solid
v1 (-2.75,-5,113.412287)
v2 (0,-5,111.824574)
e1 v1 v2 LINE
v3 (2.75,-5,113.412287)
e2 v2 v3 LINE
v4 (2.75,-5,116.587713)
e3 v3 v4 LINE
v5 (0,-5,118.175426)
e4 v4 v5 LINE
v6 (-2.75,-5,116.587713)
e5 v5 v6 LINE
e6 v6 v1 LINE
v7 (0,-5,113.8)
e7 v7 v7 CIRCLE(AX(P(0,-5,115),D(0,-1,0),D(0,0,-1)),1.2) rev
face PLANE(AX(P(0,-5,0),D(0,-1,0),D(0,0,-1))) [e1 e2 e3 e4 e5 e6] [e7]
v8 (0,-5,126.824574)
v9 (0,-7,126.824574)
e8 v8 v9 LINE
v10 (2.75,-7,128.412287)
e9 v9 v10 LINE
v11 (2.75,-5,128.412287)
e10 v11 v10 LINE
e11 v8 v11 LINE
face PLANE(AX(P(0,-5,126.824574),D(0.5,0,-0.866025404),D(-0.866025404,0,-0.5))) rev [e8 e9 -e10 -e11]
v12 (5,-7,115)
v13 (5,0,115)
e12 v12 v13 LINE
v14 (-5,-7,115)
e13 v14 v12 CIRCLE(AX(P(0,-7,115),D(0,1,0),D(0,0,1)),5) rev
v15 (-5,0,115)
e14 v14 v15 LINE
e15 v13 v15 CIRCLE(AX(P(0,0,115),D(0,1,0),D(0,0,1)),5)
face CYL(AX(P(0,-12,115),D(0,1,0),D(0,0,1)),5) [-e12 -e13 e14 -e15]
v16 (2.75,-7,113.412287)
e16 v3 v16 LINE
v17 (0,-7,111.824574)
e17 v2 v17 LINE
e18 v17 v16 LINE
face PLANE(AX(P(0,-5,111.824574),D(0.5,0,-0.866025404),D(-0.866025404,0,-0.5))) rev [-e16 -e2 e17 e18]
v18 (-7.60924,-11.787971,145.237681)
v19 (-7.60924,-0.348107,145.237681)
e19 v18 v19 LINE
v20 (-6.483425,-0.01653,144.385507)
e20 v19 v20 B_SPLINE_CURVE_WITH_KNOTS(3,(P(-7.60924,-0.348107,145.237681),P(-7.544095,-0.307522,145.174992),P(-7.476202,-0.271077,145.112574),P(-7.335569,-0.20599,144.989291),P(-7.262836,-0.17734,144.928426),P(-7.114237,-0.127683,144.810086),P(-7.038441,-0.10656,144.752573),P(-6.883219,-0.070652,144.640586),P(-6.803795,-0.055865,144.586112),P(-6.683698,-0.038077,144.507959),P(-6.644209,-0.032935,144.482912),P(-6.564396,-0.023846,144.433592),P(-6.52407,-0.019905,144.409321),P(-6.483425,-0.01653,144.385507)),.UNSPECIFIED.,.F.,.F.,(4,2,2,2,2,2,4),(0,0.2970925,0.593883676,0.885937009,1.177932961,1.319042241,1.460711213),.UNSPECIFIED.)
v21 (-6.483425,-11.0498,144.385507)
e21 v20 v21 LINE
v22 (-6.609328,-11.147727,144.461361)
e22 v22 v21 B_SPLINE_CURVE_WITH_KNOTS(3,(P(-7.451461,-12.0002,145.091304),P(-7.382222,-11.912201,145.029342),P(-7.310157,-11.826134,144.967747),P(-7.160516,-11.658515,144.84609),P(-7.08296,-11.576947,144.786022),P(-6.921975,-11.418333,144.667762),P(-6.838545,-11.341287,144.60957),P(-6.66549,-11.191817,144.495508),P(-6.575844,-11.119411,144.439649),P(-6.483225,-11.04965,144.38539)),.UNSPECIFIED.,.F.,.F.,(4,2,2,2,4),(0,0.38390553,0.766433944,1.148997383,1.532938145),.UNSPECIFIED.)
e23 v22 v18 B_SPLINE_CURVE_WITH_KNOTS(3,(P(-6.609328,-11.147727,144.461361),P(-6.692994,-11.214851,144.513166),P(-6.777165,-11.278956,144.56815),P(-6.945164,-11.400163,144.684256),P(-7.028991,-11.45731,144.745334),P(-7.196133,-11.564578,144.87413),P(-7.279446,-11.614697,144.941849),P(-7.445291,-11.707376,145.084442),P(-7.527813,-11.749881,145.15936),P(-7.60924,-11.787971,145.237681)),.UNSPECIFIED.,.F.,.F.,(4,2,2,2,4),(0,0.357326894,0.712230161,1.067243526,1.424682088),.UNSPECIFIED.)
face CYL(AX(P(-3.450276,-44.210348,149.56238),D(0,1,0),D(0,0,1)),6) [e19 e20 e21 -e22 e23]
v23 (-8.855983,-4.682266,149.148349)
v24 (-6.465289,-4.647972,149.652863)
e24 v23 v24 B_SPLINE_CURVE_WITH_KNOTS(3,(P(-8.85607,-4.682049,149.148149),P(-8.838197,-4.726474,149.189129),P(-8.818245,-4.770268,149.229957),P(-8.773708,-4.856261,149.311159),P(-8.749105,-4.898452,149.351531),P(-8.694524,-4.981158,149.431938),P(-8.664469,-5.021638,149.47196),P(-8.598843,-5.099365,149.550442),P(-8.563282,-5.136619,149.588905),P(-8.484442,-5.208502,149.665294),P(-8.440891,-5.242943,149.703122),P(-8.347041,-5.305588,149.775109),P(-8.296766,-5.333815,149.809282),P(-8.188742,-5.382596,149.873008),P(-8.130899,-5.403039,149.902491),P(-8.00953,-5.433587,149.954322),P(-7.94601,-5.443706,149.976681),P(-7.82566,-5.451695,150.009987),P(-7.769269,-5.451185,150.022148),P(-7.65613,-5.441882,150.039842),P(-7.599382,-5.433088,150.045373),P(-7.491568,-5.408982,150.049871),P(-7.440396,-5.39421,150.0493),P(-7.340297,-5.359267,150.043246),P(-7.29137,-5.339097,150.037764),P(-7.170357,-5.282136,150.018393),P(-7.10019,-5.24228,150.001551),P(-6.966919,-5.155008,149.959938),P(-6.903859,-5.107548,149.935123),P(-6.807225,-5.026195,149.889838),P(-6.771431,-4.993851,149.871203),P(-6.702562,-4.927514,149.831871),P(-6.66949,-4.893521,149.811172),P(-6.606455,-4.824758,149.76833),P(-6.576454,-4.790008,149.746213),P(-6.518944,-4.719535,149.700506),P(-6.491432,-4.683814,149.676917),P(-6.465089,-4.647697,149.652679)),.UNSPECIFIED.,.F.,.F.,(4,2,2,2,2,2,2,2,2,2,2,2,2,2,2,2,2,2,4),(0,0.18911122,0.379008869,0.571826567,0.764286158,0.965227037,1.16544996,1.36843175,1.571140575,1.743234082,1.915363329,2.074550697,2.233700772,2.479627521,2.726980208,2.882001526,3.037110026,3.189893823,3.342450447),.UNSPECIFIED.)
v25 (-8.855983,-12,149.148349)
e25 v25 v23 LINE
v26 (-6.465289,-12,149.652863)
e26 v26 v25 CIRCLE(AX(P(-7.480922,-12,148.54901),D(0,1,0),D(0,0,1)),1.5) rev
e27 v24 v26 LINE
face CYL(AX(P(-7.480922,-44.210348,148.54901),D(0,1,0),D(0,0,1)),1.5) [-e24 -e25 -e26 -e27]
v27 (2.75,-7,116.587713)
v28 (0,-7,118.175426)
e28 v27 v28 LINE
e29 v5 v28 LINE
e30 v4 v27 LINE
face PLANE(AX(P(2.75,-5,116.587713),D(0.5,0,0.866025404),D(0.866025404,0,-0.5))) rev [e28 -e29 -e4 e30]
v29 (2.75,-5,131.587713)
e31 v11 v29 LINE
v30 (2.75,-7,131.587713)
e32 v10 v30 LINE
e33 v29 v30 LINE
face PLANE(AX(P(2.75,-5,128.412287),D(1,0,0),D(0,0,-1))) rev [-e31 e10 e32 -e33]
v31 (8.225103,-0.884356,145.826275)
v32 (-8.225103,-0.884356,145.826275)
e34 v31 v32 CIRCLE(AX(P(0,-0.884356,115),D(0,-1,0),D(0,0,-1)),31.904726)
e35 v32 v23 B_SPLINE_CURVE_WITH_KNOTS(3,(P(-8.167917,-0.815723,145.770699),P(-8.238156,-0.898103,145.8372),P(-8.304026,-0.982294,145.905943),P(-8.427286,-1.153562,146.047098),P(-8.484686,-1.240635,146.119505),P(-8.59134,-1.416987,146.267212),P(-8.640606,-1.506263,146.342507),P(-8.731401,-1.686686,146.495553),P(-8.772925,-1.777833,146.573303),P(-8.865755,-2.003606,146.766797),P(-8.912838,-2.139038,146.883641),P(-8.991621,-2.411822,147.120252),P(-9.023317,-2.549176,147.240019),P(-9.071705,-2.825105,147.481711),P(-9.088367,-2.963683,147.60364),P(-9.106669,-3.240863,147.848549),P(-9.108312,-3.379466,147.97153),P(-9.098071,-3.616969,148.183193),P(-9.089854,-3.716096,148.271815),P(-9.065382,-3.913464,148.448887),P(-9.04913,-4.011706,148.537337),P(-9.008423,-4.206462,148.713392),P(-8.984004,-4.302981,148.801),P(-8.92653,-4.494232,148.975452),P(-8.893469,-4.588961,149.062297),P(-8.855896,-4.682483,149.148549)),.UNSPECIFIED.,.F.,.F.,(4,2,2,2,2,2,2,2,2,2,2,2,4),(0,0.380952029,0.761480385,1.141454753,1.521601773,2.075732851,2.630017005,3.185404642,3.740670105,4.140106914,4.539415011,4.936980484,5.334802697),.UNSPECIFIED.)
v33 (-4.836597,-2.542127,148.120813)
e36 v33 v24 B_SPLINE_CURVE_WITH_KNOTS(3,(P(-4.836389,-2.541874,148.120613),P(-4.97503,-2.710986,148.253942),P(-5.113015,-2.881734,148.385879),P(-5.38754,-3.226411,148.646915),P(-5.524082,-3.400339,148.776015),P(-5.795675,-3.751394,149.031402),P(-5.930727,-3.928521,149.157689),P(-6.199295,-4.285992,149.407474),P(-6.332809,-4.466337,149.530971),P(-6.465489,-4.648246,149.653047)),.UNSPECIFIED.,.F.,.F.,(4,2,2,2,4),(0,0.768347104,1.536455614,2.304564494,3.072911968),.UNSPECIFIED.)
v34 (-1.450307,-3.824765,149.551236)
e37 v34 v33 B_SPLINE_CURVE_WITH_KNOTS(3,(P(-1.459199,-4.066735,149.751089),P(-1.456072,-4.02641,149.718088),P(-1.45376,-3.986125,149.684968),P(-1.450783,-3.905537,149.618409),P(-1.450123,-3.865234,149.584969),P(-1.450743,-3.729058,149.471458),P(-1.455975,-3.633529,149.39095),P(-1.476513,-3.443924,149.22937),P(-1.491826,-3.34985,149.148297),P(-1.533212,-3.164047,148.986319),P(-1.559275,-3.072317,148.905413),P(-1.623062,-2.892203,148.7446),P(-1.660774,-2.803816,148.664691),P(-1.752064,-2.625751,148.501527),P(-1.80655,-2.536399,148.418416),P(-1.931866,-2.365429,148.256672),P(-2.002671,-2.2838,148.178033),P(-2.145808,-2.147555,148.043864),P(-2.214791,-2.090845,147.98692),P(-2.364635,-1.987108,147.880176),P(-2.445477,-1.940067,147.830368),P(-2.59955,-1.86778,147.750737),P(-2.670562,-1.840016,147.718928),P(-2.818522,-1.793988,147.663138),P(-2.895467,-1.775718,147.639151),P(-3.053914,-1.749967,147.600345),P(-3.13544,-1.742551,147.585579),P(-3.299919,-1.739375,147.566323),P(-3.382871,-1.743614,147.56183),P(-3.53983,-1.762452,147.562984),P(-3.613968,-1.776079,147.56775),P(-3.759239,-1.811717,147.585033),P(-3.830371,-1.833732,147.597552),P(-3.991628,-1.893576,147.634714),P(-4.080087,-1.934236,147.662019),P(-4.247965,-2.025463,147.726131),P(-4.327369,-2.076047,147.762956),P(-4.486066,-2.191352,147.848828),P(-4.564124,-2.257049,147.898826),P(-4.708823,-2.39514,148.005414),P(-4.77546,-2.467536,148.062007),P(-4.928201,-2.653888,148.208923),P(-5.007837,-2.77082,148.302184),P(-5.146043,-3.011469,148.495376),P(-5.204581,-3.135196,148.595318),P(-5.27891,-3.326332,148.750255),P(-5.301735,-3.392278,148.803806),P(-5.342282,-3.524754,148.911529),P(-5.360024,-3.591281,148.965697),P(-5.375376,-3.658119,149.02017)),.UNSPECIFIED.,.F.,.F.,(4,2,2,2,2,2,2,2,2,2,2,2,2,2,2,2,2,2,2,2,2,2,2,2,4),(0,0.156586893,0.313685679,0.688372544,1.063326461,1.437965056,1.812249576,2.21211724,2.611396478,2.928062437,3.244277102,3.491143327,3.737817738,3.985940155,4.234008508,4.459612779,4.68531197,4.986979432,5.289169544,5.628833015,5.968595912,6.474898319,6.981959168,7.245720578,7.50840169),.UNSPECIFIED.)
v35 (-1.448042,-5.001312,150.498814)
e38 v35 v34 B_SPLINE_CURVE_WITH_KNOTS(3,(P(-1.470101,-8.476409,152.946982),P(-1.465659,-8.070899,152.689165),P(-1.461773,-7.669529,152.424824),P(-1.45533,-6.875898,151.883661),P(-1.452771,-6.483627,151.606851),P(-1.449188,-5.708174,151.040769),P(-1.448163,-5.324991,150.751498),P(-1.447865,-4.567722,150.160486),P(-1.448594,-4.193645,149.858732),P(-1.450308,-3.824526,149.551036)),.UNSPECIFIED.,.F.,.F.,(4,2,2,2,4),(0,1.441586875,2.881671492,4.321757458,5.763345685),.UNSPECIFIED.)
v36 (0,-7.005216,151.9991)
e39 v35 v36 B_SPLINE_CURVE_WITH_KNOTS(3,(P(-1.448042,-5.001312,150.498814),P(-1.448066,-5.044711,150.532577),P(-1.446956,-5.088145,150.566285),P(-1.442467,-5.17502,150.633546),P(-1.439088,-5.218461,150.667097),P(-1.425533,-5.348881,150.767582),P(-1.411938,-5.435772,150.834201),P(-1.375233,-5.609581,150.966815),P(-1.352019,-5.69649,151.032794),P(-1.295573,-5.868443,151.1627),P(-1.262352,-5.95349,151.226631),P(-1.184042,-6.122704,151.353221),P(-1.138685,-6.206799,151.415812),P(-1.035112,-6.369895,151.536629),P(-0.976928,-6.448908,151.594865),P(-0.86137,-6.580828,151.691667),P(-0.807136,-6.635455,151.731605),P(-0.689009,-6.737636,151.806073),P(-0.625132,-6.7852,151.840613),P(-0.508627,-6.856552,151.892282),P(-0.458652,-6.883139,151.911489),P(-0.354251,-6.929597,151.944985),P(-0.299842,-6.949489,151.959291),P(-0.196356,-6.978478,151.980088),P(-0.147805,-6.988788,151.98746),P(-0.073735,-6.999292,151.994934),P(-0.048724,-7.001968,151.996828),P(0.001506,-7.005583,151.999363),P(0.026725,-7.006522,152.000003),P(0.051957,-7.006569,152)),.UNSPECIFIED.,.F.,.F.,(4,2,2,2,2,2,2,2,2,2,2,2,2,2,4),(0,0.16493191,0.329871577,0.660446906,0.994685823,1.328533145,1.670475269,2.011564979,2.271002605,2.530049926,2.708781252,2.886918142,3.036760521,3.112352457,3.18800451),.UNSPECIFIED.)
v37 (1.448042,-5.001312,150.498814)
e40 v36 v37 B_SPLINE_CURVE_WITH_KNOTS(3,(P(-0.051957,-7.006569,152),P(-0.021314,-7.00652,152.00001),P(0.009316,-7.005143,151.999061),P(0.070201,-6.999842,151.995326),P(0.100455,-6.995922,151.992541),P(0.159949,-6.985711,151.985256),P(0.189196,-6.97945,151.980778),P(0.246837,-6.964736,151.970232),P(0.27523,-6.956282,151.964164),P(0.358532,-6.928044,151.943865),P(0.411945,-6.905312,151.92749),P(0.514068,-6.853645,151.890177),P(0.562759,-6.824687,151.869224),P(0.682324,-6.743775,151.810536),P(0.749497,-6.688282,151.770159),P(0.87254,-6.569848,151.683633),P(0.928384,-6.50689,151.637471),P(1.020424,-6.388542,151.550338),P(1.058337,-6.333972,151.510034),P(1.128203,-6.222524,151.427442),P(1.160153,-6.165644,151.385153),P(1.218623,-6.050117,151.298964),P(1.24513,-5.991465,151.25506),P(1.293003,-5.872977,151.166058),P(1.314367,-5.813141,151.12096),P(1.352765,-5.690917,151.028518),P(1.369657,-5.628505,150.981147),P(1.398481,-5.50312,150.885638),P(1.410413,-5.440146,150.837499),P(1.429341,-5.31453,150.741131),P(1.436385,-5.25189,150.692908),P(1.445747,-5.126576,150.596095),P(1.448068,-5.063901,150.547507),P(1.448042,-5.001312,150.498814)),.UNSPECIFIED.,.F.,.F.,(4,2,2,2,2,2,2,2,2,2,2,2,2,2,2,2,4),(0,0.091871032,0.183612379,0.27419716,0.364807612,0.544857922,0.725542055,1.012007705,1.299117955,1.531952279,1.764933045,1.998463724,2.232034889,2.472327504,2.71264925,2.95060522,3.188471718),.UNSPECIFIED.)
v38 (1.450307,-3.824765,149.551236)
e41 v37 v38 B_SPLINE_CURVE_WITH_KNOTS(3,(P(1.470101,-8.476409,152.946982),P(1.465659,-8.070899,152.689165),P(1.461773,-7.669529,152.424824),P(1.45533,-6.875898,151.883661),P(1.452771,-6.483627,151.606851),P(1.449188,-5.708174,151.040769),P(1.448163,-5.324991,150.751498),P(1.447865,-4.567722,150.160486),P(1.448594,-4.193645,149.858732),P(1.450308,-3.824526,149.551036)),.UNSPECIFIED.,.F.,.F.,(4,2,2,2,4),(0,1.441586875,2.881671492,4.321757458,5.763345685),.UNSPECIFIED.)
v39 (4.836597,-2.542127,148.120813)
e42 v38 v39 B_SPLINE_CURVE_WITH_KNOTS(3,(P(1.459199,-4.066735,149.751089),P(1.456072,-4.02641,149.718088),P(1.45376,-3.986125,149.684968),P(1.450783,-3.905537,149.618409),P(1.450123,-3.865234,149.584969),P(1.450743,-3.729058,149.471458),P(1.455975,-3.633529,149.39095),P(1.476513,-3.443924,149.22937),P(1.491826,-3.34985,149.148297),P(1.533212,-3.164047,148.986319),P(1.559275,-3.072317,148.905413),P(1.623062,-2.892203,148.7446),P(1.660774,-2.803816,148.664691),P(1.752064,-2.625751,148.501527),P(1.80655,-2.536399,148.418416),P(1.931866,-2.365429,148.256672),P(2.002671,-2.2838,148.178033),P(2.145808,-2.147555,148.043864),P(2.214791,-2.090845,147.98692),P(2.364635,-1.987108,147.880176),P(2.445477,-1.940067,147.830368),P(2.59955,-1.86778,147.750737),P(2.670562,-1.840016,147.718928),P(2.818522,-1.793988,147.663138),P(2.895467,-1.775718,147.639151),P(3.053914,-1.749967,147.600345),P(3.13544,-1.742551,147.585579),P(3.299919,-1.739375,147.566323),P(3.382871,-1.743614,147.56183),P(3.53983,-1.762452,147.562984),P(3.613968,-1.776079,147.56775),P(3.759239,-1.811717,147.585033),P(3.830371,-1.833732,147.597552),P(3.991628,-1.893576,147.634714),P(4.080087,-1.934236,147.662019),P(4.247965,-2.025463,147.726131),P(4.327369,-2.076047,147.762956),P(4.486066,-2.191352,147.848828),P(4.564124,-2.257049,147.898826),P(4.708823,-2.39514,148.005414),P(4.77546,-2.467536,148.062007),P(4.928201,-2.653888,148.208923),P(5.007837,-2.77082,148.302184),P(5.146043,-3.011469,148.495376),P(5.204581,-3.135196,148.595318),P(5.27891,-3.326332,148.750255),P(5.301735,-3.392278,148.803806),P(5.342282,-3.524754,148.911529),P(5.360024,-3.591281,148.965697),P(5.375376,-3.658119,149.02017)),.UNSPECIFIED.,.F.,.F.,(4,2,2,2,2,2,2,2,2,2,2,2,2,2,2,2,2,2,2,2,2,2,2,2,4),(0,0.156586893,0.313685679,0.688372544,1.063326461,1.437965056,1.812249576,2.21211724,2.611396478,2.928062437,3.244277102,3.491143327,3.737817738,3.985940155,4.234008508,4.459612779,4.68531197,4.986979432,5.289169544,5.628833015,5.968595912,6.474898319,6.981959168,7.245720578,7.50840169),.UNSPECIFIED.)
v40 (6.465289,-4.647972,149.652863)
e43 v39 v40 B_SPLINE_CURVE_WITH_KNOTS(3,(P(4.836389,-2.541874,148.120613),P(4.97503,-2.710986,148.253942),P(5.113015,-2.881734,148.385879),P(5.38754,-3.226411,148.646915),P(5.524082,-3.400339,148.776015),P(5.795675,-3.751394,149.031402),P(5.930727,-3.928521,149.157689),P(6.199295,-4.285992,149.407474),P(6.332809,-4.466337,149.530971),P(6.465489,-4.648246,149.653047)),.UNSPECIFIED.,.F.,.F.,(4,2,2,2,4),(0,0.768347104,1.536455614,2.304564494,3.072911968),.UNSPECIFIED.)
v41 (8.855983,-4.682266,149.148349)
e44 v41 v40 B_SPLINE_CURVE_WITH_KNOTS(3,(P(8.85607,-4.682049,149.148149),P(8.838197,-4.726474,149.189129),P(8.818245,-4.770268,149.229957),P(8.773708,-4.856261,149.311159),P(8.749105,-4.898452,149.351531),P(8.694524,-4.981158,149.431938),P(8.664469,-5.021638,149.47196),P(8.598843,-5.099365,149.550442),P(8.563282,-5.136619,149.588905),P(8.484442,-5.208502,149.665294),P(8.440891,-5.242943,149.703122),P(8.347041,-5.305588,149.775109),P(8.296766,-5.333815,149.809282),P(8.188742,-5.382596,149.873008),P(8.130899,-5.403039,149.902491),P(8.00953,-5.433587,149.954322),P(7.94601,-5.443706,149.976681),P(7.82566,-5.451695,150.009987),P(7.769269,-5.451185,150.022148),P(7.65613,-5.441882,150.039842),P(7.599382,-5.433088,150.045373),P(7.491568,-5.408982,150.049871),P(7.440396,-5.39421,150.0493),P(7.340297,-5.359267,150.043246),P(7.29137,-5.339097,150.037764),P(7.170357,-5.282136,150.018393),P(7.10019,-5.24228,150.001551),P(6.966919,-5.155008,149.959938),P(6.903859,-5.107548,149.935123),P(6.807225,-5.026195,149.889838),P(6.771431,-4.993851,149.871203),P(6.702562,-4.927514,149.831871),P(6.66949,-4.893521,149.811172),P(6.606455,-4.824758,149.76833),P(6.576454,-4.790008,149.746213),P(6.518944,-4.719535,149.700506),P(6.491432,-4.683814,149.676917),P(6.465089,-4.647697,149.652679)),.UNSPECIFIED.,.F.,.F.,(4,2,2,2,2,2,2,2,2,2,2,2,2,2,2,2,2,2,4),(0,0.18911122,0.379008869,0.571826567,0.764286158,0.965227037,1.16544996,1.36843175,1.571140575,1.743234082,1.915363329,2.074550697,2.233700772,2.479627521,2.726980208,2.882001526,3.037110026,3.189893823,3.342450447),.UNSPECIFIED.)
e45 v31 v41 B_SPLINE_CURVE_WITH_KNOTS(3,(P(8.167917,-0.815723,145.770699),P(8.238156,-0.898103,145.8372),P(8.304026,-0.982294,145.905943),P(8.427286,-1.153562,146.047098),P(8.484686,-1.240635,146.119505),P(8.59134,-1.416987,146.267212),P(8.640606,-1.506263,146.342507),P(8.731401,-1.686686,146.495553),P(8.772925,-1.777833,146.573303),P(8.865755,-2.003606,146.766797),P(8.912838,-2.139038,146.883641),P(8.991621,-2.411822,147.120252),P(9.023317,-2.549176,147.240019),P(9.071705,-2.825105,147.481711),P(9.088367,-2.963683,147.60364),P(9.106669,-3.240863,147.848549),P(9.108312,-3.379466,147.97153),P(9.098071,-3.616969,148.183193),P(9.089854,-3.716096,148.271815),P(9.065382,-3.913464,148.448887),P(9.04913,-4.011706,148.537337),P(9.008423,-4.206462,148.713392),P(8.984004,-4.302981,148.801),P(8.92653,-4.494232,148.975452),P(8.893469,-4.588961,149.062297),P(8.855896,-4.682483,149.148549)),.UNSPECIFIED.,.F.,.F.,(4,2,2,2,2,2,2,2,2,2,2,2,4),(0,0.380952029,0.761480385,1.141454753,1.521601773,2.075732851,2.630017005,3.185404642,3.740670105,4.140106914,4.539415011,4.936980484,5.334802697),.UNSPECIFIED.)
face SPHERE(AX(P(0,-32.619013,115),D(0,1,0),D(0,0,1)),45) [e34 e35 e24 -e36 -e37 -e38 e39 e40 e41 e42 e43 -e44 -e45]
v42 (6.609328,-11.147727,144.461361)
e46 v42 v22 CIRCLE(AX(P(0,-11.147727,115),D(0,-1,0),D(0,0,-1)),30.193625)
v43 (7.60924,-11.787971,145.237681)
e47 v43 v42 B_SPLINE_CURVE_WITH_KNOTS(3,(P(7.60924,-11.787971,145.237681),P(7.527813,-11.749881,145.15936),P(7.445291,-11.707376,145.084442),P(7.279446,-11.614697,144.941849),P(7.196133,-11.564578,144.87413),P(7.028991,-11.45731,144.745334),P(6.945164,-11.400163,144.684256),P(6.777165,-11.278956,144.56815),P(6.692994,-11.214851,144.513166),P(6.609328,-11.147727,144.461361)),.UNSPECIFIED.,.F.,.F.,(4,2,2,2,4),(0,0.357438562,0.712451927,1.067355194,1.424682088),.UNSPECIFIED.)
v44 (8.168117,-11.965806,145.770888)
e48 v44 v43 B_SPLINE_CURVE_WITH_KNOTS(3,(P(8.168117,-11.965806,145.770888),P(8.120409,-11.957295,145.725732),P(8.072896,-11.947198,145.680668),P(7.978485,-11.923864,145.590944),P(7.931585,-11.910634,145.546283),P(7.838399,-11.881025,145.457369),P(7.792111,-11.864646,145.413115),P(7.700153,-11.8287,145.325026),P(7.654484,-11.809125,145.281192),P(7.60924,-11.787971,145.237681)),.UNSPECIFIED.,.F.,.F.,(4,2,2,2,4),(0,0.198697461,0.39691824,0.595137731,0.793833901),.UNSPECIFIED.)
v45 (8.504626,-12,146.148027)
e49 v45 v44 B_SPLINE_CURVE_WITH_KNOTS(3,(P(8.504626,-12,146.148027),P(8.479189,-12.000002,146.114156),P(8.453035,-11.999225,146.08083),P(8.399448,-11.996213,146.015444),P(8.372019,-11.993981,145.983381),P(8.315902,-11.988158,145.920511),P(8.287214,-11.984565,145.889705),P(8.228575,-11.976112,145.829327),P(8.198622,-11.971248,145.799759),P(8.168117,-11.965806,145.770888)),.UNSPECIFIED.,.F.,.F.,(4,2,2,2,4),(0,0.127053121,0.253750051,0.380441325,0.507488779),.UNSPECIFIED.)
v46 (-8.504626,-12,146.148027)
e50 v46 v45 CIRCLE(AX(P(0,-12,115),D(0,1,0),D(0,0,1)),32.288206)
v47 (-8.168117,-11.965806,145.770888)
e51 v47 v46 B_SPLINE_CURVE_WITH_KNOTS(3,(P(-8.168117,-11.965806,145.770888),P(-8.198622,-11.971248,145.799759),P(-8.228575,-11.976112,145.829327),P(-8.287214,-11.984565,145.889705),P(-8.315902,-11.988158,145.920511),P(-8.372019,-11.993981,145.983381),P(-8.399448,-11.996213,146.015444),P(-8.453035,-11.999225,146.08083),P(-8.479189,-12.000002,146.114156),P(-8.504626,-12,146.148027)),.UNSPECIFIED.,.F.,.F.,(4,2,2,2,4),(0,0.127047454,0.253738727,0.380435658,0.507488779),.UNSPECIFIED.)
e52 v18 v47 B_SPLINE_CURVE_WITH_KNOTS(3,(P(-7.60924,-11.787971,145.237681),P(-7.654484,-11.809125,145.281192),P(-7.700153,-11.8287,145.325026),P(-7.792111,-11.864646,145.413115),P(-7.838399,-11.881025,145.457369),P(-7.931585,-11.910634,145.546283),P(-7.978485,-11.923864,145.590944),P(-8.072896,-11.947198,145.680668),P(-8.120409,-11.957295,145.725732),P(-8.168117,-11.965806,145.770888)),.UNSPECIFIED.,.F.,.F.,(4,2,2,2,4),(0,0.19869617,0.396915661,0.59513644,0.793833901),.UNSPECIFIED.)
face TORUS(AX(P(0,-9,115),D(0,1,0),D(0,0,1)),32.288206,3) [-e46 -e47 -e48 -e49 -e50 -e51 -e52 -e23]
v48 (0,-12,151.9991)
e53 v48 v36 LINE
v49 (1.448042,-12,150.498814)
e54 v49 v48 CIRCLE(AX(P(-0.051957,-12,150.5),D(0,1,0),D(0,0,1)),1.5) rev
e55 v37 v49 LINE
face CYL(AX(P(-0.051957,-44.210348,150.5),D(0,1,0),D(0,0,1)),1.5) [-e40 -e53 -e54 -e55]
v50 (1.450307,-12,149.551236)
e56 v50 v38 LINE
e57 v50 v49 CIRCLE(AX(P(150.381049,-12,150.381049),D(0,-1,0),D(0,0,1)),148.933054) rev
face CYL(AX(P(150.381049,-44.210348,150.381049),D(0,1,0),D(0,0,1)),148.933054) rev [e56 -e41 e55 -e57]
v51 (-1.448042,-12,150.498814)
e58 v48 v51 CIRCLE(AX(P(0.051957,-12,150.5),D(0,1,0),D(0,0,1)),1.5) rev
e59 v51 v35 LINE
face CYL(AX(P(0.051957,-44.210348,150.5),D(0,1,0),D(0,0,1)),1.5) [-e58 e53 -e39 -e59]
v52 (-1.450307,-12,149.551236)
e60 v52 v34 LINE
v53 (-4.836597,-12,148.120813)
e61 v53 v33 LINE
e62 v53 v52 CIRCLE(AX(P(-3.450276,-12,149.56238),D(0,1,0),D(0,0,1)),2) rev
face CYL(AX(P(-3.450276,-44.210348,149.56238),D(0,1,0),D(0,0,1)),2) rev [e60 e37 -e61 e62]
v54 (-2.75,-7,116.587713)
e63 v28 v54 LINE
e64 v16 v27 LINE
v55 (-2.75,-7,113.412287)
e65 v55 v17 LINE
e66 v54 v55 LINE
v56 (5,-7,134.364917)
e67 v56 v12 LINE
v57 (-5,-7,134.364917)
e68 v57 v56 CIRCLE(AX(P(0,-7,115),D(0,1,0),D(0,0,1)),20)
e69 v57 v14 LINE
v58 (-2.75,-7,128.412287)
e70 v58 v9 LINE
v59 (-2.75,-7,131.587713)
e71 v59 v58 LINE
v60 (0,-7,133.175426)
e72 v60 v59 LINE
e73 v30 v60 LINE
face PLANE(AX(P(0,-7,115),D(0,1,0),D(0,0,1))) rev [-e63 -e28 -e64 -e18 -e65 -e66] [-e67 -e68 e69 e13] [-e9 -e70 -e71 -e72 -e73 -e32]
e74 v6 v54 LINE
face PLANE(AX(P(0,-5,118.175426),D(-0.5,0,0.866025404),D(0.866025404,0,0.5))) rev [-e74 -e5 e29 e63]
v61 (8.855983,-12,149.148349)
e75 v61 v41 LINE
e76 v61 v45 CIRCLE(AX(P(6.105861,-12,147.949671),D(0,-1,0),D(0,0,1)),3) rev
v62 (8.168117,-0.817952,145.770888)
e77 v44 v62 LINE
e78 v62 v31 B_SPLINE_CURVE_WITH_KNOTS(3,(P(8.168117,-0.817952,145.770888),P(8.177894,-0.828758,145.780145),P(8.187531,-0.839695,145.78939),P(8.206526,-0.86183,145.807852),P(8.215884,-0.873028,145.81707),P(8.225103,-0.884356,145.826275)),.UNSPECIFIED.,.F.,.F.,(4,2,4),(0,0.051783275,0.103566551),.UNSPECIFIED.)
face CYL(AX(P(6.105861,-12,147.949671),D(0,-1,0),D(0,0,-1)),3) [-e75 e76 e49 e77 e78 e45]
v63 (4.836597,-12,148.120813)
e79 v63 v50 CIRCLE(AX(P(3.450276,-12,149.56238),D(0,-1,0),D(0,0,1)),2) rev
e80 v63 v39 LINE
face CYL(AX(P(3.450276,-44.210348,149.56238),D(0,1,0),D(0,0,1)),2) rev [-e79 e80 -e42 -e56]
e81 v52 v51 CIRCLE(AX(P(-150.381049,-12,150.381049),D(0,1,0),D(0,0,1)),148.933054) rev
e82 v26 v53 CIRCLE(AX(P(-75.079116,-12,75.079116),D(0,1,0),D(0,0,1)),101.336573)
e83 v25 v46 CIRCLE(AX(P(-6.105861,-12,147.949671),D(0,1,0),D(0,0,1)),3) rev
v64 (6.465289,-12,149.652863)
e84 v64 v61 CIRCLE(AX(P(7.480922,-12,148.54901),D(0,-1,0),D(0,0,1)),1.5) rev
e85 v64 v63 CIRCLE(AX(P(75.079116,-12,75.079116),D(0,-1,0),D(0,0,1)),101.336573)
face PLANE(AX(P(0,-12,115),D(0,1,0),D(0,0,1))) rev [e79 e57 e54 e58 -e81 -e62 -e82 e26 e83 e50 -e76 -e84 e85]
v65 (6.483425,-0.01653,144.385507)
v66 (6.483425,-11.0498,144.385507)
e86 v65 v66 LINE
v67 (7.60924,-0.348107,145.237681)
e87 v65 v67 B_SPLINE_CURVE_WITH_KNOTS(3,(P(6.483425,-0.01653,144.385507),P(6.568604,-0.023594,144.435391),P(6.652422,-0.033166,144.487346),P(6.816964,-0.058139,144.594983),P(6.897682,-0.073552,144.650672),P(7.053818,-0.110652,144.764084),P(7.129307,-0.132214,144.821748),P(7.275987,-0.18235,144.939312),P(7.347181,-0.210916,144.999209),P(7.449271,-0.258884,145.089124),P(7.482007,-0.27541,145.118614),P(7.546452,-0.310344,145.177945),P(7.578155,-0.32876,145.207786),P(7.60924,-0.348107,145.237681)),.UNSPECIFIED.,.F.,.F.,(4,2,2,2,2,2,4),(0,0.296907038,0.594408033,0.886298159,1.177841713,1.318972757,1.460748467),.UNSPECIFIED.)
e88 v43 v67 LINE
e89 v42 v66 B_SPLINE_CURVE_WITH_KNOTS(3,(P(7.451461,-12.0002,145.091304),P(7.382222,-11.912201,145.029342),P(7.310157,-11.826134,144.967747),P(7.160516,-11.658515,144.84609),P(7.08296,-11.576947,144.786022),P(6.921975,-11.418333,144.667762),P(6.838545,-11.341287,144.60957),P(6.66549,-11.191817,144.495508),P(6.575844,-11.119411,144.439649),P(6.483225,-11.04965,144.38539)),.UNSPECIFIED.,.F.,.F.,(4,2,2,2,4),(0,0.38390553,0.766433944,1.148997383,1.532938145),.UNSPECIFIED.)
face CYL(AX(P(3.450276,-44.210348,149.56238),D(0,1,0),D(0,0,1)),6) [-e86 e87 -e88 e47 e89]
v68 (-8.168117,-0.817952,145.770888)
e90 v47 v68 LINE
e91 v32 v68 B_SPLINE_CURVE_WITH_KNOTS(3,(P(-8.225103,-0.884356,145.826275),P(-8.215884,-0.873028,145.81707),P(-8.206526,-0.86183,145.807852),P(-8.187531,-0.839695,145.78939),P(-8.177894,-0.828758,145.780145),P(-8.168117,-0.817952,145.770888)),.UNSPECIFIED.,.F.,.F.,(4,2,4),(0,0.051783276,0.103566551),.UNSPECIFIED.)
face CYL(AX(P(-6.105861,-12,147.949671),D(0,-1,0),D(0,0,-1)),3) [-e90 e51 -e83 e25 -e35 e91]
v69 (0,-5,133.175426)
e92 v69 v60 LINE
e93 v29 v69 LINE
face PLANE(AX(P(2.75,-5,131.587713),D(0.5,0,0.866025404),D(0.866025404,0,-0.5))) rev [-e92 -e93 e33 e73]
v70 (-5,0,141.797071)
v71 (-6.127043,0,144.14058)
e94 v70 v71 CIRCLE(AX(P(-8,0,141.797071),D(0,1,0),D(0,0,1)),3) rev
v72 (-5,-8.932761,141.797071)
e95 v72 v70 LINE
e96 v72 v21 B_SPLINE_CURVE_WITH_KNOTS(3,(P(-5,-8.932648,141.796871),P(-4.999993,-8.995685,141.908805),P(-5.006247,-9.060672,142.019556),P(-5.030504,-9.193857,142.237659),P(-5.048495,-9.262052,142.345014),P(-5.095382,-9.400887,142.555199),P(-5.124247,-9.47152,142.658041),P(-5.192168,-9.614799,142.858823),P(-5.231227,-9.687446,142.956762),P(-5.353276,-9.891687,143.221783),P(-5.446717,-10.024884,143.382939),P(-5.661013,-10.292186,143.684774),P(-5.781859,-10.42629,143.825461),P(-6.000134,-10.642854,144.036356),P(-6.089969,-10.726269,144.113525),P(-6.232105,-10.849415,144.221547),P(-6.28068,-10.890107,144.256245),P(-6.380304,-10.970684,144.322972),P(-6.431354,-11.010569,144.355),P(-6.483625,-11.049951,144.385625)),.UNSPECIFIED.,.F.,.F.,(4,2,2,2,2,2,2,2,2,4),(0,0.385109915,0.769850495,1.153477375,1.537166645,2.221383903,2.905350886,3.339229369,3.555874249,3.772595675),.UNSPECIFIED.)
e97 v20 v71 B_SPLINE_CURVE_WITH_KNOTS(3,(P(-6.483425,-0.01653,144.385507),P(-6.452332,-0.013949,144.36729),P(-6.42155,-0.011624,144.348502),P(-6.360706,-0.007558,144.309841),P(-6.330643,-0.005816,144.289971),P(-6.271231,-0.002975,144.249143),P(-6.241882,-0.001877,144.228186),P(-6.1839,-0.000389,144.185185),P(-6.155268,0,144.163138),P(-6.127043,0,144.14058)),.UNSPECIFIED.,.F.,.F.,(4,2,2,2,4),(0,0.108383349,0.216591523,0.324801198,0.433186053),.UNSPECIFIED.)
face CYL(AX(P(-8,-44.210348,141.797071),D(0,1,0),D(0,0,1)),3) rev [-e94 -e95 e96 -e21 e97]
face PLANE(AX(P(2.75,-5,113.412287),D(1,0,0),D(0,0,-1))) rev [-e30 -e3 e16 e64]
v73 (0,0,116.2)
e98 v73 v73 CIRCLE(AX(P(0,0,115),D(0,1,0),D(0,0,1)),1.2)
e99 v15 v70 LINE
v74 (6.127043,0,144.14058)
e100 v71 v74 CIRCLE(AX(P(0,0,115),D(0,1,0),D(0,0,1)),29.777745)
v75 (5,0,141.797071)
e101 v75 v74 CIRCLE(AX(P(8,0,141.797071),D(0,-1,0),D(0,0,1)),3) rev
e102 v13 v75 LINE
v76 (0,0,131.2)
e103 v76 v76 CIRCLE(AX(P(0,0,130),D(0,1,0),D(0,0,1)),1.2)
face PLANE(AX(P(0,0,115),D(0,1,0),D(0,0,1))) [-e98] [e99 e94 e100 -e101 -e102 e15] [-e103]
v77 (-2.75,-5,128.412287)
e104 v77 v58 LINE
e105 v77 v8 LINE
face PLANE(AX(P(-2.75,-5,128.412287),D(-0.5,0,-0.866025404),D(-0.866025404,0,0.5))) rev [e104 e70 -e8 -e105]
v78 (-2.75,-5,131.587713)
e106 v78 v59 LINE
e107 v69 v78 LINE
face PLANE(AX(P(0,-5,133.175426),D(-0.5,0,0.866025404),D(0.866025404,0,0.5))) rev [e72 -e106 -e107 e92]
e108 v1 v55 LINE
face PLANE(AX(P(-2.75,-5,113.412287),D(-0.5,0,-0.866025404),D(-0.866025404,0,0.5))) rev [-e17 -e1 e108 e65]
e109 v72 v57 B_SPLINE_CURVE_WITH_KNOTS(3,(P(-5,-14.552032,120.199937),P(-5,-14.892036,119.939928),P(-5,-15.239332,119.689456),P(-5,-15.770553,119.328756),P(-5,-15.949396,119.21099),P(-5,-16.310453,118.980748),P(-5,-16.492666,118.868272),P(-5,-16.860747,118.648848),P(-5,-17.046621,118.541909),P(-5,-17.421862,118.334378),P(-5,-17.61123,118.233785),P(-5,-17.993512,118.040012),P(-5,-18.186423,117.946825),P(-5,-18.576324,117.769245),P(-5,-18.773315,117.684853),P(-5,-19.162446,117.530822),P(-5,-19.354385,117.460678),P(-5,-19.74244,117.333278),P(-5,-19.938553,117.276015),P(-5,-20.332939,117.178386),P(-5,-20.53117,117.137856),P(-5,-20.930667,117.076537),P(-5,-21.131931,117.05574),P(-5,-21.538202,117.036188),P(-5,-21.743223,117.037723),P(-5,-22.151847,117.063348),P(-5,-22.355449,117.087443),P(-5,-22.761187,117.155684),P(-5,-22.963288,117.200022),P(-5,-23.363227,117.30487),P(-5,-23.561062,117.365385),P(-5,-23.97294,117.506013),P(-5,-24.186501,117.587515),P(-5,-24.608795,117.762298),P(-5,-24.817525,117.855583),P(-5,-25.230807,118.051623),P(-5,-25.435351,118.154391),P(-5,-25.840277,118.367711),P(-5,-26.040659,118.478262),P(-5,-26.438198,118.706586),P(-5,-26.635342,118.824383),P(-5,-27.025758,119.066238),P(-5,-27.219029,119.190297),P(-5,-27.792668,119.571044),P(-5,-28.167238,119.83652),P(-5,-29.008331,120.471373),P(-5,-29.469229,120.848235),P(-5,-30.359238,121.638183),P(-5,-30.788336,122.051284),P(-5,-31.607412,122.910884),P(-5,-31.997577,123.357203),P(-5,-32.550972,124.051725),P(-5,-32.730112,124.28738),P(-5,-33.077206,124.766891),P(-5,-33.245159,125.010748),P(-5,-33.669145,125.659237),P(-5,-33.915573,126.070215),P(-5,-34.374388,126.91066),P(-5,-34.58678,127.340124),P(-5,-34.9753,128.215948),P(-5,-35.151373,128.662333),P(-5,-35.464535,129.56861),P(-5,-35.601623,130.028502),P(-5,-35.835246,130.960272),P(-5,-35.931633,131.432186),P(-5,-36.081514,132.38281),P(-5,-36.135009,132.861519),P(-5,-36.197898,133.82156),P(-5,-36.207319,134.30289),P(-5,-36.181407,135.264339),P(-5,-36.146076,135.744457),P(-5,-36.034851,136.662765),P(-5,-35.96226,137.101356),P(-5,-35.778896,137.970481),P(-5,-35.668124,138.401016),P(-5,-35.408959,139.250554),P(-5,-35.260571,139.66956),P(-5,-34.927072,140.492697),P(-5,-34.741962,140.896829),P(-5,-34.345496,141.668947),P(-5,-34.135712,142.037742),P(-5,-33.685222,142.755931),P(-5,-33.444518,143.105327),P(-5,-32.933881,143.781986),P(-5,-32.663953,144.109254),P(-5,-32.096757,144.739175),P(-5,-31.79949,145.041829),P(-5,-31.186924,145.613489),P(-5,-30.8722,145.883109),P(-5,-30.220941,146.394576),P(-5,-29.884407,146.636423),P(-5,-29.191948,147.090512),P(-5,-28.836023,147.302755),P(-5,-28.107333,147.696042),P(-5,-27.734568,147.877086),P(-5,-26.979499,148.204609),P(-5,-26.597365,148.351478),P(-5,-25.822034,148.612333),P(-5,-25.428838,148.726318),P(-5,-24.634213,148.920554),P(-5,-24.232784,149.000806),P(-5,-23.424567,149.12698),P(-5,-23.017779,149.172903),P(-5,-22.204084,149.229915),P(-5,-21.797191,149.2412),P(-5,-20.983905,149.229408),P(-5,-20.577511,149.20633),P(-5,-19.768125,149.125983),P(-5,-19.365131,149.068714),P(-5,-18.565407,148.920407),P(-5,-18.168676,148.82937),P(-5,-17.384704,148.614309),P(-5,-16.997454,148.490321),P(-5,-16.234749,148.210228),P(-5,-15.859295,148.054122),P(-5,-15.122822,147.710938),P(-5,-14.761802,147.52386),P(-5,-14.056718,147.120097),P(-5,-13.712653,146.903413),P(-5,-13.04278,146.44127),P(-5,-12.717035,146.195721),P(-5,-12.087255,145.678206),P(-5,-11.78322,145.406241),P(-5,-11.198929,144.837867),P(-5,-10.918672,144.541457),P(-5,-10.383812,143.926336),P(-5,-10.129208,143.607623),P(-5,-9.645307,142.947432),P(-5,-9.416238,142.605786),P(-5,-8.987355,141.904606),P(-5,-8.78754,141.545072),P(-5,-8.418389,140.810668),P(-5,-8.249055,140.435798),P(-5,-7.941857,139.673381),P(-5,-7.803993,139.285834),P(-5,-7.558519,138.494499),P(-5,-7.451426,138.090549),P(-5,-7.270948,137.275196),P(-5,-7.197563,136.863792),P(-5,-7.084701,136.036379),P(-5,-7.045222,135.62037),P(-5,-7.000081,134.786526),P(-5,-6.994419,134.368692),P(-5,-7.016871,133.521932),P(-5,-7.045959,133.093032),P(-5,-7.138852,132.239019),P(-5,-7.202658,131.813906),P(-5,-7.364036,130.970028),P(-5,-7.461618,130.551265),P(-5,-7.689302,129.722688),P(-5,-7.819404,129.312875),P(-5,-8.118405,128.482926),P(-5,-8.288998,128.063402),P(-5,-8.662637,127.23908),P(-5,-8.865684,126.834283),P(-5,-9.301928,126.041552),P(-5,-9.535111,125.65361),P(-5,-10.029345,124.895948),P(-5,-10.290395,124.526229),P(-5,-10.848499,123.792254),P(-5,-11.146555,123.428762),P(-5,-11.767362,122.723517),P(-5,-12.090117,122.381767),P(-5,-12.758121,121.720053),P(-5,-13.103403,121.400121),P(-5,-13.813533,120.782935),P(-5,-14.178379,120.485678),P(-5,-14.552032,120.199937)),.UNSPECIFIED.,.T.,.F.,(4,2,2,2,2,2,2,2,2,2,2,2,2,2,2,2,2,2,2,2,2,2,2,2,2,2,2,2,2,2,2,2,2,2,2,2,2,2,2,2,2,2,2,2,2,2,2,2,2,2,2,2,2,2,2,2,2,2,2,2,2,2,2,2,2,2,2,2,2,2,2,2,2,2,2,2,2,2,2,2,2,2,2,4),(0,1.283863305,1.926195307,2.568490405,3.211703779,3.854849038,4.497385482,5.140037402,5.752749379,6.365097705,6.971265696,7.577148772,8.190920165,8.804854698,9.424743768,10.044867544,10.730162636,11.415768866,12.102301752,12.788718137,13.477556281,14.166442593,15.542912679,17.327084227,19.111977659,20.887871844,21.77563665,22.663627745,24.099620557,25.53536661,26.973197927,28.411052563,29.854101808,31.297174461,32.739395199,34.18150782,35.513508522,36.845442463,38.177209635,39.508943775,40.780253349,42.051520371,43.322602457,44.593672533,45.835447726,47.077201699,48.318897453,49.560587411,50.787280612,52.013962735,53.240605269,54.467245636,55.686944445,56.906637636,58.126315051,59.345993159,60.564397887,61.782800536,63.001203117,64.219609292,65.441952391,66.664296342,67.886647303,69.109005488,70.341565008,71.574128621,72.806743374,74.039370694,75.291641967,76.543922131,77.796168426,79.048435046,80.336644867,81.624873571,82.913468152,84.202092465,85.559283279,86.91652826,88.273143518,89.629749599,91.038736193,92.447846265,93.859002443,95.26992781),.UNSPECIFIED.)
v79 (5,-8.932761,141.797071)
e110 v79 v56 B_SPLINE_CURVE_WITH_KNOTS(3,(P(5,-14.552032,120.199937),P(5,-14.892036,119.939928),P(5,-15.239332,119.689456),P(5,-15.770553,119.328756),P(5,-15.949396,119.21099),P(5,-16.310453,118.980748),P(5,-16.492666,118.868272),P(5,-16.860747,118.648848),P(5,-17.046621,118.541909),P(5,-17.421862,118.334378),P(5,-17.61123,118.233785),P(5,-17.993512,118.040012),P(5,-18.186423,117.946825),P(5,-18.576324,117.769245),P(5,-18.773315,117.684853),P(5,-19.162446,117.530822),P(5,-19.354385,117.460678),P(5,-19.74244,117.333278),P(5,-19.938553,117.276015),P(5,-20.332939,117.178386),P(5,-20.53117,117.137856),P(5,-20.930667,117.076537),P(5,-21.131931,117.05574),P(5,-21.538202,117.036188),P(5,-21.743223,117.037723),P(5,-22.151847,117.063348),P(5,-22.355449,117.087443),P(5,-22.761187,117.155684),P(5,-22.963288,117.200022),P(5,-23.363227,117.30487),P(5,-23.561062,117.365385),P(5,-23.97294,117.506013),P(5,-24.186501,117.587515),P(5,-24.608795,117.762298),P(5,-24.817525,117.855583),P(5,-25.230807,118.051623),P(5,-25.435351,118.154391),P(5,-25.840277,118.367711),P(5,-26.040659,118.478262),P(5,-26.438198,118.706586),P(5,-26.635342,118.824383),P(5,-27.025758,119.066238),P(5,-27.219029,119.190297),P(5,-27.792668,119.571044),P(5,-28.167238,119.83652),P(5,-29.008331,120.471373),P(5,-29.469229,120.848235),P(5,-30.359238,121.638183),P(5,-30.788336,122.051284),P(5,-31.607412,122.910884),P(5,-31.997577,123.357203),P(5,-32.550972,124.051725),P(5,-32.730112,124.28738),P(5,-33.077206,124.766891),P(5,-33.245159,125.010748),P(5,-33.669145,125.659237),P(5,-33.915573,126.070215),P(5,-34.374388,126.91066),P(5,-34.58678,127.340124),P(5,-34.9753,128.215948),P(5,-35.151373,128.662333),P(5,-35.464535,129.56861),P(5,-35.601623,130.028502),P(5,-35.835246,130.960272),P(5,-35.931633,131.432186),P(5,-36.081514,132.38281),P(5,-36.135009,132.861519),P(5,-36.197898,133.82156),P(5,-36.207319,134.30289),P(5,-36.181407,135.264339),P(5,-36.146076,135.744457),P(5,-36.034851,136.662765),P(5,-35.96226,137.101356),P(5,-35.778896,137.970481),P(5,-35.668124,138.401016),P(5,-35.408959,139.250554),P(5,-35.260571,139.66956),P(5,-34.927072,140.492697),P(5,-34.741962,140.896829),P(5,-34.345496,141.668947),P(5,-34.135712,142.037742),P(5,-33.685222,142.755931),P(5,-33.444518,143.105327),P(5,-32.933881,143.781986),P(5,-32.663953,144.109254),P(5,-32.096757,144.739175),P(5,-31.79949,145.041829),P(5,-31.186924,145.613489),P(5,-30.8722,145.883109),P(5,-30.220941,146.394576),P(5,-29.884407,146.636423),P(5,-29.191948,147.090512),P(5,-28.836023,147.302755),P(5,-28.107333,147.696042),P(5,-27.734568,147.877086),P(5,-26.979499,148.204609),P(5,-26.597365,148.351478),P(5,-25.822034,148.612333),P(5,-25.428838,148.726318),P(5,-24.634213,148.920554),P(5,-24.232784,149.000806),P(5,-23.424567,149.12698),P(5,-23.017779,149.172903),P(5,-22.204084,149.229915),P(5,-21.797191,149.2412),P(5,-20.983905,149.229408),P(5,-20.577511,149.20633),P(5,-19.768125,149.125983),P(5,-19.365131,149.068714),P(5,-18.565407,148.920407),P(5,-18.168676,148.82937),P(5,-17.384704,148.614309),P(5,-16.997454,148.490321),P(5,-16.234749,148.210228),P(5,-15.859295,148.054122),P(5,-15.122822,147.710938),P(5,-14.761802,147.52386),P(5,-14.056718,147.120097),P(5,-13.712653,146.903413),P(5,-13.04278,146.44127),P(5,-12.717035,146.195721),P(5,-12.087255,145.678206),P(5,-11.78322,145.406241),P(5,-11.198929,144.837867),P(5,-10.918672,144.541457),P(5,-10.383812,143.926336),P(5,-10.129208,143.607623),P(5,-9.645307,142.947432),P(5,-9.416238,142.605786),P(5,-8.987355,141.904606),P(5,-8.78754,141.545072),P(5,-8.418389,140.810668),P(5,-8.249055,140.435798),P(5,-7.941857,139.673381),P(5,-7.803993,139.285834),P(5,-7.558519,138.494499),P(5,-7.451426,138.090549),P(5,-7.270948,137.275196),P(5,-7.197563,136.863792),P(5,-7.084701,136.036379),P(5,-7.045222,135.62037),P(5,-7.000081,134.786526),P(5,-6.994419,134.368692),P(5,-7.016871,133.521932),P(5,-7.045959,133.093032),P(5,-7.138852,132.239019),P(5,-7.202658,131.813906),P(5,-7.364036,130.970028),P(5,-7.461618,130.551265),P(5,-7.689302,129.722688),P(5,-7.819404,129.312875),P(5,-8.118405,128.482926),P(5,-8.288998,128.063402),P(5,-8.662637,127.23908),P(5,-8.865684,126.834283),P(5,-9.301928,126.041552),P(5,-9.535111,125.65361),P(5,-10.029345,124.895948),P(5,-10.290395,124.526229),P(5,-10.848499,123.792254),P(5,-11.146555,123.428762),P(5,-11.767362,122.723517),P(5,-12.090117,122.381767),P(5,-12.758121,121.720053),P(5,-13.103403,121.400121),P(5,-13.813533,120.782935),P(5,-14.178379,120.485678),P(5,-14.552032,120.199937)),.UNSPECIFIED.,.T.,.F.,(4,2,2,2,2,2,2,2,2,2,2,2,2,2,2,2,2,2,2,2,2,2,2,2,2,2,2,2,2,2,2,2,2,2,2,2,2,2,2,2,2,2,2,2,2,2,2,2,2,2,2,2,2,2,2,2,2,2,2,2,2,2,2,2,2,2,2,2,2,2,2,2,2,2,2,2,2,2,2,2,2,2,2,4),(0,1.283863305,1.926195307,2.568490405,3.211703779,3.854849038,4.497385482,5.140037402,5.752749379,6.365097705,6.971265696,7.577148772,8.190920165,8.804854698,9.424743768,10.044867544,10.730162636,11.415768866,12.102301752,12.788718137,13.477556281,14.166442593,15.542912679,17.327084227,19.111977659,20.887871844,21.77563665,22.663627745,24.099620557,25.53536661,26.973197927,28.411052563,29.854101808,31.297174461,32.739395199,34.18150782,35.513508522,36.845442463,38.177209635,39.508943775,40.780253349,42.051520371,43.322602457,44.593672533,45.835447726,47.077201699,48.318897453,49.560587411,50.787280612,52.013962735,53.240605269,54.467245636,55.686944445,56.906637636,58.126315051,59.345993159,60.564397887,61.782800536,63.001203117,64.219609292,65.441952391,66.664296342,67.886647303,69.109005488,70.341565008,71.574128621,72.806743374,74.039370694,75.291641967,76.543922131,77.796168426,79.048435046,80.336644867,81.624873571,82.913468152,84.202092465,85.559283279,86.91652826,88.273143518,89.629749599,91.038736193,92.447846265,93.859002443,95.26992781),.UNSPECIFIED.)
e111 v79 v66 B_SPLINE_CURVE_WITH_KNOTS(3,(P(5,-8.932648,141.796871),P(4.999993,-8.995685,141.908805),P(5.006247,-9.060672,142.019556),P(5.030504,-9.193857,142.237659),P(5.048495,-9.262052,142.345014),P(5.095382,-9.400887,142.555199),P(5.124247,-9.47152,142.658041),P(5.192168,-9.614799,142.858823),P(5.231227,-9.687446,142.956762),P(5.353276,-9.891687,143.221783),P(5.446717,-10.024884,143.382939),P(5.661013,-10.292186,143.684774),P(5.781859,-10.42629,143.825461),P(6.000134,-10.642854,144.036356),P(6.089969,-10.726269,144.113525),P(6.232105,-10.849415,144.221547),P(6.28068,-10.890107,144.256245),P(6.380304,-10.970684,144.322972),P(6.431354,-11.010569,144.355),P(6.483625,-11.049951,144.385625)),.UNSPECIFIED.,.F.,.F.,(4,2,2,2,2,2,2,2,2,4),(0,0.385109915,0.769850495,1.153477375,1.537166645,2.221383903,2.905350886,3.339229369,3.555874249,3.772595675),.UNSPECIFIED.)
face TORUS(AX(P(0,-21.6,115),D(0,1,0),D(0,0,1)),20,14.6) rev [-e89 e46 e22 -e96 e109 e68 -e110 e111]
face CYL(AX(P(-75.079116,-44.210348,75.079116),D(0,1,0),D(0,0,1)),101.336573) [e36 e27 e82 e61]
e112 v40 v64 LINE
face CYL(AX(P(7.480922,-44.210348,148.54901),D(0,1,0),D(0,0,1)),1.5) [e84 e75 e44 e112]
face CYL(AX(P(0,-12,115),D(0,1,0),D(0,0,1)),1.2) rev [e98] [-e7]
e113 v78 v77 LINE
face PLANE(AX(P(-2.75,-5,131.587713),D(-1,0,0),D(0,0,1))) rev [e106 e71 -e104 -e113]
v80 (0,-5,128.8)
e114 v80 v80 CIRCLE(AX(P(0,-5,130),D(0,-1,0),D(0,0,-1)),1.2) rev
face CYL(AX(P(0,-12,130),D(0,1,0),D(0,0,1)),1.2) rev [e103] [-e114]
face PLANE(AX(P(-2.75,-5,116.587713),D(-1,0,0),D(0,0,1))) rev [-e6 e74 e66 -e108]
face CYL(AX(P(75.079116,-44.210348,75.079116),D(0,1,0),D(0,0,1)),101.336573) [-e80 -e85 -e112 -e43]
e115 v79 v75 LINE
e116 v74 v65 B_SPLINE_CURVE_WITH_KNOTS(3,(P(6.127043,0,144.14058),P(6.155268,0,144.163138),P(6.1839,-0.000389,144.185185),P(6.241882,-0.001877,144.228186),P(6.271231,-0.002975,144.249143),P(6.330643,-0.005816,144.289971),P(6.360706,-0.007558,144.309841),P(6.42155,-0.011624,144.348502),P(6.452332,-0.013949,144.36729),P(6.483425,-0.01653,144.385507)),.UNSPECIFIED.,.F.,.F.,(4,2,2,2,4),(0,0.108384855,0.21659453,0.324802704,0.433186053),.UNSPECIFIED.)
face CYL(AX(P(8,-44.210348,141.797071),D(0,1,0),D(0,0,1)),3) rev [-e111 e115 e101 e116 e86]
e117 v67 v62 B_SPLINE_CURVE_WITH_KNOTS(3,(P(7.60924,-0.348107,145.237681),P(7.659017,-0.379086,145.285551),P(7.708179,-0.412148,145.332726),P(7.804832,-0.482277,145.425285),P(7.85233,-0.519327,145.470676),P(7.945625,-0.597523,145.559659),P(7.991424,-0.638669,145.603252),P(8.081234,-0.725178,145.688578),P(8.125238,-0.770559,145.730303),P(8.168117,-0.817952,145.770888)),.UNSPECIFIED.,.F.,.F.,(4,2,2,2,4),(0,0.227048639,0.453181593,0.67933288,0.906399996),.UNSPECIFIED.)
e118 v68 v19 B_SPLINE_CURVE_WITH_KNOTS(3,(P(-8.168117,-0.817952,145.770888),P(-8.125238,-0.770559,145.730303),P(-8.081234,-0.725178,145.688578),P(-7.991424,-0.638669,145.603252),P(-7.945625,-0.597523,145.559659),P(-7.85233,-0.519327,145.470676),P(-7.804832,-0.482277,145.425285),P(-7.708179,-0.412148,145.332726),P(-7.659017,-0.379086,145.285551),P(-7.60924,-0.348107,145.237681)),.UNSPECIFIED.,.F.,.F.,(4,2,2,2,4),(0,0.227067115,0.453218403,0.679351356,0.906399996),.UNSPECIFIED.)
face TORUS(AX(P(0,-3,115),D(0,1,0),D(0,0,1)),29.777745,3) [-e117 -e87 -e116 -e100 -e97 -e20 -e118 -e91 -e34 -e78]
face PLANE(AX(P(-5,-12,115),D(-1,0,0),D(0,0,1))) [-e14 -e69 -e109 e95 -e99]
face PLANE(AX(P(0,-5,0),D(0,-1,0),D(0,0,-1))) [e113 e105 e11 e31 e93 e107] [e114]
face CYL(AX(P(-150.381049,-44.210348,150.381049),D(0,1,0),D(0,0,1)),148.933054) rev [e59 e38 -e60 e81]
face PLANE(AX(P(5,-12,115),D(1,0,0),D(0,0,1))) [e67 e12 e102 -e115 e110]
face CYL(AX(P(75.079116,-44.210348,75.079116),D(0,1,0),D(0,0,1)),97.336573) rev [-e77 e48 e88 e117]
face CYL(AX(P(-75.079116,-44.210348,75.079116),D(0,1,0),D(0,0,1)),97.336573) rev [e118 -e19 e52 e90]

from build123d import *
from build123d.topology import SkipClean

# Parameters (mm, degrees)
ESQUISSE1_R             = 1.2
BOSS_EXTRU_1_DEPTH      = 12
BOSS_EXTRU_2_DEPTH      = 12
ESQUISSE3_OUTSIDE_W     = 37.484
ESQUISSE3_OUTSIDE_H     = 73.419
ENL_V_MAT_EXTRU_1_DEPTH = 170.970209289
CONG_2_R                = 3
CONG_1_R                = 1.5
ESQUISSE7_W             = 0.946782305
ESQUISSE7_H             = 12
ENL_V_MAT_EXTRU_5_DEPTH = 15
CONG_3_R                = 1.5
ENL_V_MAT_EXTRU_3_DEPTH = 2
CONG_4_R                = 3


with BuildPart() as part:
    # Esquisse1 → Boss.-Extru.1 (new body)
    with BuildSketch(Plane(origin=(0, 0, 0), x_dir=(1, 0, 0), z_dir=(0, 1, 0))):
        with BuildLine():
            Line((5, -115), (5, -146))
            Line((5, -146), (-5, -146))
            Line((-5, -146), (-5, -115))
            ThreePointArc((-5, -115), (0, -110), (5, -115))
        make_face()
        with Locations(Location((0, -115, 0), (0, 0, 270))):
            Circle(ESQUISSE1_R, mode=Mode.SUBTRACT)
        with Locations(Location((0, -130, 0), (0, 0, 270))):
            Circle(ESQUISSE1_R, mode=Mode.SUBTRACT)
    extrude(amount=-BOSS_EXTRU_1_DEPTH)

    # Esquisse2 → Boss.-Extru.2 (add)
    with BuildSketch(Plane(origin=(0, 0, 0), x_dir=(1, 0, 0), z_dir=(0, 1, 0))):
        with BuildLine():
            ThreePointArc((2.297654972, -159.197635973), (2.500096708, -154.365285132), (2.549630638, -149.52894936))
            ThreePointArc((2.549630638, -149.52894936), (-1.115535331, -144.03526605), (-7.609239761, -145.237680564))
            ThreePointArc((-7.609239761, -145.237680564), (-10.72587755, -148.106981091), (-13.96441251, -150.837953067))
            ThreePointArc((-13.96441251, -150.837953067), (-12.257608054, -167.514829553), (2.297654972, -159.197635973))
        make_face()
        with BuildLine():
            ThreePointArc((-11.452932946, -153.951226328), (-8.081311937, -151.108026363), (-4.836597406, -148.1208133))
            ThreePointArc((-4.836597406, -148.1208133), (-2.672029263, -147.720008461), (-1.450307273, -149.551236231))
            ThreePointArc((-1.450307273, -149.551236231), (-1.498545632, -154.261076504), (-1.695692457, -158.967036072))
            ThreePointArc((-1.695692457, -158.967036072), (-10.428850272, -163.95735222), (-11.452932946, -153.951226328))
        make_face(mode=Mode.SUBTRACT)
    extrude(amount=-BOSS_EXTRU_2_DEPTH)

    # Esquisse3 outside → Enlèv. mat.-Extru.1 (cut, through all)
    with BuildSketch(Plane(origin=(0, 0, 0), x_dir=(1, 0, 0), z_dir=(0, 1, 0))):
        with Locations((-6.343, -139.3105)):
            Rectangle(ESQUISSE3_OUTSIDE_W, ESQUISSE3_OUTSIDE_H)
        with BuildLine():
            Line((-13, -140.030172342), (-13, -110))
            Line((-13, -110), (0, -110))
            Line((0, -110), (0, -153.030172342))
            ThreePointArc((0, -153.030172342), (-9.192388155, -149.222560498), (-13, -140.030172342))
        make_face(mode=Mode.SUBTRACT)
    extrude(amount=-ENL_V_MAT_EXTRU_1_DEPTH, mode=Mode.SUBTRACT)

    # Congé2
    cong_2_edges = [part.edges().sort_by_distance(p)[0] for p in [
        (-5, -6, 143.765970759),
        (-10.40524253, -6, 147.823177404),
    ]]
    fillet(cong_2_edges, radius=CONG_2_R)

    # Congé1
    cong_1_edges = [part.edges().sort_by_distance(p)[0] for p in [
        (-7.535402248, -6, 150.623458563),
    ]]
    fillet(cong_1_edges, radius=CONG_1_R)

    # Esquisse5 → Enlèvement de matière-Révolution1 (revolve, cut)
    with BuildSketch(Plane(origin=(0, 0, 0), x_dir=(0, 0, -1), z_dir=(1, 0, 0))):
        with BuildLine():
            Line((-146, -12), (-115, -12))
            Line((-115, -12), (-115, -7))
            Line((-115, -7), (-135, -7))
            ThreePointArc((-135, -7), (-141.041522987, -8.308649429), (-146, -12))
        make_face()
        with BuildLine():
            Line((-146, 0), (-160, 0))
            Line((-160, 0), (-160, -32.619012861))
            ThreePointArc((-160, -32.619012861), (-156.352146256, -14.870773511), (-146, 0))
        make_face()
    revolve(axis=Axis((0, 0, 115), (0, -1, 0)), mode=Mode.SUBTRACT)

    # Symétrie1: part across plane


with BuildPart() as part_1:
    with SkipClean():  # the faces are left unmerged after this step: merging them gives an invalid solid
        add(part.part)
        add(part.part.mirror(Plane(origin=(0, 0, 0), x_dir=(0, 0, 1), z_dir=(1, 0, 0))))

    # Esquisse7 → Enlèv. mat.-Extru.5 (cut)
    with SkipClean():  # the faces are left unmerged after this step: merging them gives an invalid solid
        with BuildSketch(Plane(origin=(5, 0, 0), x_dir=(0, 0, -1), z_dir=(1, 0, 0))):
            with Locations((-152.473391152, -6)):
                Rectangle(ESQUISSE7_W, ESQUISSE7_H)
        extrude(amount=-ENL_V_MAT_EXTRU_5_DEPTH, mode=Mode.SUBTRACT)


with BuildPart() as enl_v_mat_extru_5_kept_piece:
    # of the separate pieces the step leaves, the one the design keeps (enl_v_mat_extru_5_pieces_kept)
    add(part_1.part.solids().sort_by_distance((0, 0, 146))[0])

    # Congé3
    # the kernel refuses this fillet: 1.5 mm, written as the material it takes off along each edge
    with BuildSketch(Plane(origin=(-1.456795034, -15.771881232, 152), x_dir=(0.005830598143572619, 0, -0.9999830019181767), z_dir=(0, 1, 0))) as cong_3_piece_1:
        with BuildLine():
            CenterArc((1.508771432, -1.49998095), CONG_3_R, 90.288765492, 90.045305066)
            Line((0.008796929, -1.508726847), (0, 0))
            ThreePointArc((0, 0), (0.750605801, -0.001891496), (1.501211601, 0))
        make_face()
    extrude(amount=12.495782984, mode=Mode.SUBTRACT)
    with BuildSketch(Plane(origin=(1.456795034, -15.771881232, 152), x_dir=(-1, 0, 0), z_dir=(0, 1, 0))) as cong_3_piece_2:
        with BuildLine():
            CenterArc((1.508752493, -1.5), CONG_3_R, 90, 90.045305066)
            ThreePointArc((0.008752962, -1.501186084), (0.006267945, -0.750582013), (0, 0))
            Line((0, 0), (1.508752493, 0))
        make_face()
    extrude(amount=12.495782984, mode=Mode.SUBTRACT)

    # Esquisse6 → Enlèv. mat.-Extru.3 (cut)
    with BuildSketch(Plane.XZ.offset(7)):
        Polygon((2.75, 116.58771324), (0, 118.175426481), (-2.75, 116.58771324), (-2.75, 113.41228676), (0, 111.824573519), (2.75, 113.41228676), align=None)
        Polygon((2.75, 131.58771324), (0, 133.175426481), (-2.75, 131.58771324), (-2.75, 128.41228676), (0, 126.824573519), (2.75, 128.41228676), align=None)
    extrude(amount=-ENL_V_MAT_EXTRU_3_DEPTH, mode=Mode.SUBTRACT)

    # Congé4
    cong_4_edges = [enl_v_mat_extru_5_kept_piece.edges().sort_by_distance(p)[0] for p in [
        (-3.75326222, -12, 145.771951883),
        (0, 0, 146),
    ]]
    fillet(cong_4_edges, radius=CONG_4_R)


solid = enl_v_mat_extru_5_kept_piece.part
